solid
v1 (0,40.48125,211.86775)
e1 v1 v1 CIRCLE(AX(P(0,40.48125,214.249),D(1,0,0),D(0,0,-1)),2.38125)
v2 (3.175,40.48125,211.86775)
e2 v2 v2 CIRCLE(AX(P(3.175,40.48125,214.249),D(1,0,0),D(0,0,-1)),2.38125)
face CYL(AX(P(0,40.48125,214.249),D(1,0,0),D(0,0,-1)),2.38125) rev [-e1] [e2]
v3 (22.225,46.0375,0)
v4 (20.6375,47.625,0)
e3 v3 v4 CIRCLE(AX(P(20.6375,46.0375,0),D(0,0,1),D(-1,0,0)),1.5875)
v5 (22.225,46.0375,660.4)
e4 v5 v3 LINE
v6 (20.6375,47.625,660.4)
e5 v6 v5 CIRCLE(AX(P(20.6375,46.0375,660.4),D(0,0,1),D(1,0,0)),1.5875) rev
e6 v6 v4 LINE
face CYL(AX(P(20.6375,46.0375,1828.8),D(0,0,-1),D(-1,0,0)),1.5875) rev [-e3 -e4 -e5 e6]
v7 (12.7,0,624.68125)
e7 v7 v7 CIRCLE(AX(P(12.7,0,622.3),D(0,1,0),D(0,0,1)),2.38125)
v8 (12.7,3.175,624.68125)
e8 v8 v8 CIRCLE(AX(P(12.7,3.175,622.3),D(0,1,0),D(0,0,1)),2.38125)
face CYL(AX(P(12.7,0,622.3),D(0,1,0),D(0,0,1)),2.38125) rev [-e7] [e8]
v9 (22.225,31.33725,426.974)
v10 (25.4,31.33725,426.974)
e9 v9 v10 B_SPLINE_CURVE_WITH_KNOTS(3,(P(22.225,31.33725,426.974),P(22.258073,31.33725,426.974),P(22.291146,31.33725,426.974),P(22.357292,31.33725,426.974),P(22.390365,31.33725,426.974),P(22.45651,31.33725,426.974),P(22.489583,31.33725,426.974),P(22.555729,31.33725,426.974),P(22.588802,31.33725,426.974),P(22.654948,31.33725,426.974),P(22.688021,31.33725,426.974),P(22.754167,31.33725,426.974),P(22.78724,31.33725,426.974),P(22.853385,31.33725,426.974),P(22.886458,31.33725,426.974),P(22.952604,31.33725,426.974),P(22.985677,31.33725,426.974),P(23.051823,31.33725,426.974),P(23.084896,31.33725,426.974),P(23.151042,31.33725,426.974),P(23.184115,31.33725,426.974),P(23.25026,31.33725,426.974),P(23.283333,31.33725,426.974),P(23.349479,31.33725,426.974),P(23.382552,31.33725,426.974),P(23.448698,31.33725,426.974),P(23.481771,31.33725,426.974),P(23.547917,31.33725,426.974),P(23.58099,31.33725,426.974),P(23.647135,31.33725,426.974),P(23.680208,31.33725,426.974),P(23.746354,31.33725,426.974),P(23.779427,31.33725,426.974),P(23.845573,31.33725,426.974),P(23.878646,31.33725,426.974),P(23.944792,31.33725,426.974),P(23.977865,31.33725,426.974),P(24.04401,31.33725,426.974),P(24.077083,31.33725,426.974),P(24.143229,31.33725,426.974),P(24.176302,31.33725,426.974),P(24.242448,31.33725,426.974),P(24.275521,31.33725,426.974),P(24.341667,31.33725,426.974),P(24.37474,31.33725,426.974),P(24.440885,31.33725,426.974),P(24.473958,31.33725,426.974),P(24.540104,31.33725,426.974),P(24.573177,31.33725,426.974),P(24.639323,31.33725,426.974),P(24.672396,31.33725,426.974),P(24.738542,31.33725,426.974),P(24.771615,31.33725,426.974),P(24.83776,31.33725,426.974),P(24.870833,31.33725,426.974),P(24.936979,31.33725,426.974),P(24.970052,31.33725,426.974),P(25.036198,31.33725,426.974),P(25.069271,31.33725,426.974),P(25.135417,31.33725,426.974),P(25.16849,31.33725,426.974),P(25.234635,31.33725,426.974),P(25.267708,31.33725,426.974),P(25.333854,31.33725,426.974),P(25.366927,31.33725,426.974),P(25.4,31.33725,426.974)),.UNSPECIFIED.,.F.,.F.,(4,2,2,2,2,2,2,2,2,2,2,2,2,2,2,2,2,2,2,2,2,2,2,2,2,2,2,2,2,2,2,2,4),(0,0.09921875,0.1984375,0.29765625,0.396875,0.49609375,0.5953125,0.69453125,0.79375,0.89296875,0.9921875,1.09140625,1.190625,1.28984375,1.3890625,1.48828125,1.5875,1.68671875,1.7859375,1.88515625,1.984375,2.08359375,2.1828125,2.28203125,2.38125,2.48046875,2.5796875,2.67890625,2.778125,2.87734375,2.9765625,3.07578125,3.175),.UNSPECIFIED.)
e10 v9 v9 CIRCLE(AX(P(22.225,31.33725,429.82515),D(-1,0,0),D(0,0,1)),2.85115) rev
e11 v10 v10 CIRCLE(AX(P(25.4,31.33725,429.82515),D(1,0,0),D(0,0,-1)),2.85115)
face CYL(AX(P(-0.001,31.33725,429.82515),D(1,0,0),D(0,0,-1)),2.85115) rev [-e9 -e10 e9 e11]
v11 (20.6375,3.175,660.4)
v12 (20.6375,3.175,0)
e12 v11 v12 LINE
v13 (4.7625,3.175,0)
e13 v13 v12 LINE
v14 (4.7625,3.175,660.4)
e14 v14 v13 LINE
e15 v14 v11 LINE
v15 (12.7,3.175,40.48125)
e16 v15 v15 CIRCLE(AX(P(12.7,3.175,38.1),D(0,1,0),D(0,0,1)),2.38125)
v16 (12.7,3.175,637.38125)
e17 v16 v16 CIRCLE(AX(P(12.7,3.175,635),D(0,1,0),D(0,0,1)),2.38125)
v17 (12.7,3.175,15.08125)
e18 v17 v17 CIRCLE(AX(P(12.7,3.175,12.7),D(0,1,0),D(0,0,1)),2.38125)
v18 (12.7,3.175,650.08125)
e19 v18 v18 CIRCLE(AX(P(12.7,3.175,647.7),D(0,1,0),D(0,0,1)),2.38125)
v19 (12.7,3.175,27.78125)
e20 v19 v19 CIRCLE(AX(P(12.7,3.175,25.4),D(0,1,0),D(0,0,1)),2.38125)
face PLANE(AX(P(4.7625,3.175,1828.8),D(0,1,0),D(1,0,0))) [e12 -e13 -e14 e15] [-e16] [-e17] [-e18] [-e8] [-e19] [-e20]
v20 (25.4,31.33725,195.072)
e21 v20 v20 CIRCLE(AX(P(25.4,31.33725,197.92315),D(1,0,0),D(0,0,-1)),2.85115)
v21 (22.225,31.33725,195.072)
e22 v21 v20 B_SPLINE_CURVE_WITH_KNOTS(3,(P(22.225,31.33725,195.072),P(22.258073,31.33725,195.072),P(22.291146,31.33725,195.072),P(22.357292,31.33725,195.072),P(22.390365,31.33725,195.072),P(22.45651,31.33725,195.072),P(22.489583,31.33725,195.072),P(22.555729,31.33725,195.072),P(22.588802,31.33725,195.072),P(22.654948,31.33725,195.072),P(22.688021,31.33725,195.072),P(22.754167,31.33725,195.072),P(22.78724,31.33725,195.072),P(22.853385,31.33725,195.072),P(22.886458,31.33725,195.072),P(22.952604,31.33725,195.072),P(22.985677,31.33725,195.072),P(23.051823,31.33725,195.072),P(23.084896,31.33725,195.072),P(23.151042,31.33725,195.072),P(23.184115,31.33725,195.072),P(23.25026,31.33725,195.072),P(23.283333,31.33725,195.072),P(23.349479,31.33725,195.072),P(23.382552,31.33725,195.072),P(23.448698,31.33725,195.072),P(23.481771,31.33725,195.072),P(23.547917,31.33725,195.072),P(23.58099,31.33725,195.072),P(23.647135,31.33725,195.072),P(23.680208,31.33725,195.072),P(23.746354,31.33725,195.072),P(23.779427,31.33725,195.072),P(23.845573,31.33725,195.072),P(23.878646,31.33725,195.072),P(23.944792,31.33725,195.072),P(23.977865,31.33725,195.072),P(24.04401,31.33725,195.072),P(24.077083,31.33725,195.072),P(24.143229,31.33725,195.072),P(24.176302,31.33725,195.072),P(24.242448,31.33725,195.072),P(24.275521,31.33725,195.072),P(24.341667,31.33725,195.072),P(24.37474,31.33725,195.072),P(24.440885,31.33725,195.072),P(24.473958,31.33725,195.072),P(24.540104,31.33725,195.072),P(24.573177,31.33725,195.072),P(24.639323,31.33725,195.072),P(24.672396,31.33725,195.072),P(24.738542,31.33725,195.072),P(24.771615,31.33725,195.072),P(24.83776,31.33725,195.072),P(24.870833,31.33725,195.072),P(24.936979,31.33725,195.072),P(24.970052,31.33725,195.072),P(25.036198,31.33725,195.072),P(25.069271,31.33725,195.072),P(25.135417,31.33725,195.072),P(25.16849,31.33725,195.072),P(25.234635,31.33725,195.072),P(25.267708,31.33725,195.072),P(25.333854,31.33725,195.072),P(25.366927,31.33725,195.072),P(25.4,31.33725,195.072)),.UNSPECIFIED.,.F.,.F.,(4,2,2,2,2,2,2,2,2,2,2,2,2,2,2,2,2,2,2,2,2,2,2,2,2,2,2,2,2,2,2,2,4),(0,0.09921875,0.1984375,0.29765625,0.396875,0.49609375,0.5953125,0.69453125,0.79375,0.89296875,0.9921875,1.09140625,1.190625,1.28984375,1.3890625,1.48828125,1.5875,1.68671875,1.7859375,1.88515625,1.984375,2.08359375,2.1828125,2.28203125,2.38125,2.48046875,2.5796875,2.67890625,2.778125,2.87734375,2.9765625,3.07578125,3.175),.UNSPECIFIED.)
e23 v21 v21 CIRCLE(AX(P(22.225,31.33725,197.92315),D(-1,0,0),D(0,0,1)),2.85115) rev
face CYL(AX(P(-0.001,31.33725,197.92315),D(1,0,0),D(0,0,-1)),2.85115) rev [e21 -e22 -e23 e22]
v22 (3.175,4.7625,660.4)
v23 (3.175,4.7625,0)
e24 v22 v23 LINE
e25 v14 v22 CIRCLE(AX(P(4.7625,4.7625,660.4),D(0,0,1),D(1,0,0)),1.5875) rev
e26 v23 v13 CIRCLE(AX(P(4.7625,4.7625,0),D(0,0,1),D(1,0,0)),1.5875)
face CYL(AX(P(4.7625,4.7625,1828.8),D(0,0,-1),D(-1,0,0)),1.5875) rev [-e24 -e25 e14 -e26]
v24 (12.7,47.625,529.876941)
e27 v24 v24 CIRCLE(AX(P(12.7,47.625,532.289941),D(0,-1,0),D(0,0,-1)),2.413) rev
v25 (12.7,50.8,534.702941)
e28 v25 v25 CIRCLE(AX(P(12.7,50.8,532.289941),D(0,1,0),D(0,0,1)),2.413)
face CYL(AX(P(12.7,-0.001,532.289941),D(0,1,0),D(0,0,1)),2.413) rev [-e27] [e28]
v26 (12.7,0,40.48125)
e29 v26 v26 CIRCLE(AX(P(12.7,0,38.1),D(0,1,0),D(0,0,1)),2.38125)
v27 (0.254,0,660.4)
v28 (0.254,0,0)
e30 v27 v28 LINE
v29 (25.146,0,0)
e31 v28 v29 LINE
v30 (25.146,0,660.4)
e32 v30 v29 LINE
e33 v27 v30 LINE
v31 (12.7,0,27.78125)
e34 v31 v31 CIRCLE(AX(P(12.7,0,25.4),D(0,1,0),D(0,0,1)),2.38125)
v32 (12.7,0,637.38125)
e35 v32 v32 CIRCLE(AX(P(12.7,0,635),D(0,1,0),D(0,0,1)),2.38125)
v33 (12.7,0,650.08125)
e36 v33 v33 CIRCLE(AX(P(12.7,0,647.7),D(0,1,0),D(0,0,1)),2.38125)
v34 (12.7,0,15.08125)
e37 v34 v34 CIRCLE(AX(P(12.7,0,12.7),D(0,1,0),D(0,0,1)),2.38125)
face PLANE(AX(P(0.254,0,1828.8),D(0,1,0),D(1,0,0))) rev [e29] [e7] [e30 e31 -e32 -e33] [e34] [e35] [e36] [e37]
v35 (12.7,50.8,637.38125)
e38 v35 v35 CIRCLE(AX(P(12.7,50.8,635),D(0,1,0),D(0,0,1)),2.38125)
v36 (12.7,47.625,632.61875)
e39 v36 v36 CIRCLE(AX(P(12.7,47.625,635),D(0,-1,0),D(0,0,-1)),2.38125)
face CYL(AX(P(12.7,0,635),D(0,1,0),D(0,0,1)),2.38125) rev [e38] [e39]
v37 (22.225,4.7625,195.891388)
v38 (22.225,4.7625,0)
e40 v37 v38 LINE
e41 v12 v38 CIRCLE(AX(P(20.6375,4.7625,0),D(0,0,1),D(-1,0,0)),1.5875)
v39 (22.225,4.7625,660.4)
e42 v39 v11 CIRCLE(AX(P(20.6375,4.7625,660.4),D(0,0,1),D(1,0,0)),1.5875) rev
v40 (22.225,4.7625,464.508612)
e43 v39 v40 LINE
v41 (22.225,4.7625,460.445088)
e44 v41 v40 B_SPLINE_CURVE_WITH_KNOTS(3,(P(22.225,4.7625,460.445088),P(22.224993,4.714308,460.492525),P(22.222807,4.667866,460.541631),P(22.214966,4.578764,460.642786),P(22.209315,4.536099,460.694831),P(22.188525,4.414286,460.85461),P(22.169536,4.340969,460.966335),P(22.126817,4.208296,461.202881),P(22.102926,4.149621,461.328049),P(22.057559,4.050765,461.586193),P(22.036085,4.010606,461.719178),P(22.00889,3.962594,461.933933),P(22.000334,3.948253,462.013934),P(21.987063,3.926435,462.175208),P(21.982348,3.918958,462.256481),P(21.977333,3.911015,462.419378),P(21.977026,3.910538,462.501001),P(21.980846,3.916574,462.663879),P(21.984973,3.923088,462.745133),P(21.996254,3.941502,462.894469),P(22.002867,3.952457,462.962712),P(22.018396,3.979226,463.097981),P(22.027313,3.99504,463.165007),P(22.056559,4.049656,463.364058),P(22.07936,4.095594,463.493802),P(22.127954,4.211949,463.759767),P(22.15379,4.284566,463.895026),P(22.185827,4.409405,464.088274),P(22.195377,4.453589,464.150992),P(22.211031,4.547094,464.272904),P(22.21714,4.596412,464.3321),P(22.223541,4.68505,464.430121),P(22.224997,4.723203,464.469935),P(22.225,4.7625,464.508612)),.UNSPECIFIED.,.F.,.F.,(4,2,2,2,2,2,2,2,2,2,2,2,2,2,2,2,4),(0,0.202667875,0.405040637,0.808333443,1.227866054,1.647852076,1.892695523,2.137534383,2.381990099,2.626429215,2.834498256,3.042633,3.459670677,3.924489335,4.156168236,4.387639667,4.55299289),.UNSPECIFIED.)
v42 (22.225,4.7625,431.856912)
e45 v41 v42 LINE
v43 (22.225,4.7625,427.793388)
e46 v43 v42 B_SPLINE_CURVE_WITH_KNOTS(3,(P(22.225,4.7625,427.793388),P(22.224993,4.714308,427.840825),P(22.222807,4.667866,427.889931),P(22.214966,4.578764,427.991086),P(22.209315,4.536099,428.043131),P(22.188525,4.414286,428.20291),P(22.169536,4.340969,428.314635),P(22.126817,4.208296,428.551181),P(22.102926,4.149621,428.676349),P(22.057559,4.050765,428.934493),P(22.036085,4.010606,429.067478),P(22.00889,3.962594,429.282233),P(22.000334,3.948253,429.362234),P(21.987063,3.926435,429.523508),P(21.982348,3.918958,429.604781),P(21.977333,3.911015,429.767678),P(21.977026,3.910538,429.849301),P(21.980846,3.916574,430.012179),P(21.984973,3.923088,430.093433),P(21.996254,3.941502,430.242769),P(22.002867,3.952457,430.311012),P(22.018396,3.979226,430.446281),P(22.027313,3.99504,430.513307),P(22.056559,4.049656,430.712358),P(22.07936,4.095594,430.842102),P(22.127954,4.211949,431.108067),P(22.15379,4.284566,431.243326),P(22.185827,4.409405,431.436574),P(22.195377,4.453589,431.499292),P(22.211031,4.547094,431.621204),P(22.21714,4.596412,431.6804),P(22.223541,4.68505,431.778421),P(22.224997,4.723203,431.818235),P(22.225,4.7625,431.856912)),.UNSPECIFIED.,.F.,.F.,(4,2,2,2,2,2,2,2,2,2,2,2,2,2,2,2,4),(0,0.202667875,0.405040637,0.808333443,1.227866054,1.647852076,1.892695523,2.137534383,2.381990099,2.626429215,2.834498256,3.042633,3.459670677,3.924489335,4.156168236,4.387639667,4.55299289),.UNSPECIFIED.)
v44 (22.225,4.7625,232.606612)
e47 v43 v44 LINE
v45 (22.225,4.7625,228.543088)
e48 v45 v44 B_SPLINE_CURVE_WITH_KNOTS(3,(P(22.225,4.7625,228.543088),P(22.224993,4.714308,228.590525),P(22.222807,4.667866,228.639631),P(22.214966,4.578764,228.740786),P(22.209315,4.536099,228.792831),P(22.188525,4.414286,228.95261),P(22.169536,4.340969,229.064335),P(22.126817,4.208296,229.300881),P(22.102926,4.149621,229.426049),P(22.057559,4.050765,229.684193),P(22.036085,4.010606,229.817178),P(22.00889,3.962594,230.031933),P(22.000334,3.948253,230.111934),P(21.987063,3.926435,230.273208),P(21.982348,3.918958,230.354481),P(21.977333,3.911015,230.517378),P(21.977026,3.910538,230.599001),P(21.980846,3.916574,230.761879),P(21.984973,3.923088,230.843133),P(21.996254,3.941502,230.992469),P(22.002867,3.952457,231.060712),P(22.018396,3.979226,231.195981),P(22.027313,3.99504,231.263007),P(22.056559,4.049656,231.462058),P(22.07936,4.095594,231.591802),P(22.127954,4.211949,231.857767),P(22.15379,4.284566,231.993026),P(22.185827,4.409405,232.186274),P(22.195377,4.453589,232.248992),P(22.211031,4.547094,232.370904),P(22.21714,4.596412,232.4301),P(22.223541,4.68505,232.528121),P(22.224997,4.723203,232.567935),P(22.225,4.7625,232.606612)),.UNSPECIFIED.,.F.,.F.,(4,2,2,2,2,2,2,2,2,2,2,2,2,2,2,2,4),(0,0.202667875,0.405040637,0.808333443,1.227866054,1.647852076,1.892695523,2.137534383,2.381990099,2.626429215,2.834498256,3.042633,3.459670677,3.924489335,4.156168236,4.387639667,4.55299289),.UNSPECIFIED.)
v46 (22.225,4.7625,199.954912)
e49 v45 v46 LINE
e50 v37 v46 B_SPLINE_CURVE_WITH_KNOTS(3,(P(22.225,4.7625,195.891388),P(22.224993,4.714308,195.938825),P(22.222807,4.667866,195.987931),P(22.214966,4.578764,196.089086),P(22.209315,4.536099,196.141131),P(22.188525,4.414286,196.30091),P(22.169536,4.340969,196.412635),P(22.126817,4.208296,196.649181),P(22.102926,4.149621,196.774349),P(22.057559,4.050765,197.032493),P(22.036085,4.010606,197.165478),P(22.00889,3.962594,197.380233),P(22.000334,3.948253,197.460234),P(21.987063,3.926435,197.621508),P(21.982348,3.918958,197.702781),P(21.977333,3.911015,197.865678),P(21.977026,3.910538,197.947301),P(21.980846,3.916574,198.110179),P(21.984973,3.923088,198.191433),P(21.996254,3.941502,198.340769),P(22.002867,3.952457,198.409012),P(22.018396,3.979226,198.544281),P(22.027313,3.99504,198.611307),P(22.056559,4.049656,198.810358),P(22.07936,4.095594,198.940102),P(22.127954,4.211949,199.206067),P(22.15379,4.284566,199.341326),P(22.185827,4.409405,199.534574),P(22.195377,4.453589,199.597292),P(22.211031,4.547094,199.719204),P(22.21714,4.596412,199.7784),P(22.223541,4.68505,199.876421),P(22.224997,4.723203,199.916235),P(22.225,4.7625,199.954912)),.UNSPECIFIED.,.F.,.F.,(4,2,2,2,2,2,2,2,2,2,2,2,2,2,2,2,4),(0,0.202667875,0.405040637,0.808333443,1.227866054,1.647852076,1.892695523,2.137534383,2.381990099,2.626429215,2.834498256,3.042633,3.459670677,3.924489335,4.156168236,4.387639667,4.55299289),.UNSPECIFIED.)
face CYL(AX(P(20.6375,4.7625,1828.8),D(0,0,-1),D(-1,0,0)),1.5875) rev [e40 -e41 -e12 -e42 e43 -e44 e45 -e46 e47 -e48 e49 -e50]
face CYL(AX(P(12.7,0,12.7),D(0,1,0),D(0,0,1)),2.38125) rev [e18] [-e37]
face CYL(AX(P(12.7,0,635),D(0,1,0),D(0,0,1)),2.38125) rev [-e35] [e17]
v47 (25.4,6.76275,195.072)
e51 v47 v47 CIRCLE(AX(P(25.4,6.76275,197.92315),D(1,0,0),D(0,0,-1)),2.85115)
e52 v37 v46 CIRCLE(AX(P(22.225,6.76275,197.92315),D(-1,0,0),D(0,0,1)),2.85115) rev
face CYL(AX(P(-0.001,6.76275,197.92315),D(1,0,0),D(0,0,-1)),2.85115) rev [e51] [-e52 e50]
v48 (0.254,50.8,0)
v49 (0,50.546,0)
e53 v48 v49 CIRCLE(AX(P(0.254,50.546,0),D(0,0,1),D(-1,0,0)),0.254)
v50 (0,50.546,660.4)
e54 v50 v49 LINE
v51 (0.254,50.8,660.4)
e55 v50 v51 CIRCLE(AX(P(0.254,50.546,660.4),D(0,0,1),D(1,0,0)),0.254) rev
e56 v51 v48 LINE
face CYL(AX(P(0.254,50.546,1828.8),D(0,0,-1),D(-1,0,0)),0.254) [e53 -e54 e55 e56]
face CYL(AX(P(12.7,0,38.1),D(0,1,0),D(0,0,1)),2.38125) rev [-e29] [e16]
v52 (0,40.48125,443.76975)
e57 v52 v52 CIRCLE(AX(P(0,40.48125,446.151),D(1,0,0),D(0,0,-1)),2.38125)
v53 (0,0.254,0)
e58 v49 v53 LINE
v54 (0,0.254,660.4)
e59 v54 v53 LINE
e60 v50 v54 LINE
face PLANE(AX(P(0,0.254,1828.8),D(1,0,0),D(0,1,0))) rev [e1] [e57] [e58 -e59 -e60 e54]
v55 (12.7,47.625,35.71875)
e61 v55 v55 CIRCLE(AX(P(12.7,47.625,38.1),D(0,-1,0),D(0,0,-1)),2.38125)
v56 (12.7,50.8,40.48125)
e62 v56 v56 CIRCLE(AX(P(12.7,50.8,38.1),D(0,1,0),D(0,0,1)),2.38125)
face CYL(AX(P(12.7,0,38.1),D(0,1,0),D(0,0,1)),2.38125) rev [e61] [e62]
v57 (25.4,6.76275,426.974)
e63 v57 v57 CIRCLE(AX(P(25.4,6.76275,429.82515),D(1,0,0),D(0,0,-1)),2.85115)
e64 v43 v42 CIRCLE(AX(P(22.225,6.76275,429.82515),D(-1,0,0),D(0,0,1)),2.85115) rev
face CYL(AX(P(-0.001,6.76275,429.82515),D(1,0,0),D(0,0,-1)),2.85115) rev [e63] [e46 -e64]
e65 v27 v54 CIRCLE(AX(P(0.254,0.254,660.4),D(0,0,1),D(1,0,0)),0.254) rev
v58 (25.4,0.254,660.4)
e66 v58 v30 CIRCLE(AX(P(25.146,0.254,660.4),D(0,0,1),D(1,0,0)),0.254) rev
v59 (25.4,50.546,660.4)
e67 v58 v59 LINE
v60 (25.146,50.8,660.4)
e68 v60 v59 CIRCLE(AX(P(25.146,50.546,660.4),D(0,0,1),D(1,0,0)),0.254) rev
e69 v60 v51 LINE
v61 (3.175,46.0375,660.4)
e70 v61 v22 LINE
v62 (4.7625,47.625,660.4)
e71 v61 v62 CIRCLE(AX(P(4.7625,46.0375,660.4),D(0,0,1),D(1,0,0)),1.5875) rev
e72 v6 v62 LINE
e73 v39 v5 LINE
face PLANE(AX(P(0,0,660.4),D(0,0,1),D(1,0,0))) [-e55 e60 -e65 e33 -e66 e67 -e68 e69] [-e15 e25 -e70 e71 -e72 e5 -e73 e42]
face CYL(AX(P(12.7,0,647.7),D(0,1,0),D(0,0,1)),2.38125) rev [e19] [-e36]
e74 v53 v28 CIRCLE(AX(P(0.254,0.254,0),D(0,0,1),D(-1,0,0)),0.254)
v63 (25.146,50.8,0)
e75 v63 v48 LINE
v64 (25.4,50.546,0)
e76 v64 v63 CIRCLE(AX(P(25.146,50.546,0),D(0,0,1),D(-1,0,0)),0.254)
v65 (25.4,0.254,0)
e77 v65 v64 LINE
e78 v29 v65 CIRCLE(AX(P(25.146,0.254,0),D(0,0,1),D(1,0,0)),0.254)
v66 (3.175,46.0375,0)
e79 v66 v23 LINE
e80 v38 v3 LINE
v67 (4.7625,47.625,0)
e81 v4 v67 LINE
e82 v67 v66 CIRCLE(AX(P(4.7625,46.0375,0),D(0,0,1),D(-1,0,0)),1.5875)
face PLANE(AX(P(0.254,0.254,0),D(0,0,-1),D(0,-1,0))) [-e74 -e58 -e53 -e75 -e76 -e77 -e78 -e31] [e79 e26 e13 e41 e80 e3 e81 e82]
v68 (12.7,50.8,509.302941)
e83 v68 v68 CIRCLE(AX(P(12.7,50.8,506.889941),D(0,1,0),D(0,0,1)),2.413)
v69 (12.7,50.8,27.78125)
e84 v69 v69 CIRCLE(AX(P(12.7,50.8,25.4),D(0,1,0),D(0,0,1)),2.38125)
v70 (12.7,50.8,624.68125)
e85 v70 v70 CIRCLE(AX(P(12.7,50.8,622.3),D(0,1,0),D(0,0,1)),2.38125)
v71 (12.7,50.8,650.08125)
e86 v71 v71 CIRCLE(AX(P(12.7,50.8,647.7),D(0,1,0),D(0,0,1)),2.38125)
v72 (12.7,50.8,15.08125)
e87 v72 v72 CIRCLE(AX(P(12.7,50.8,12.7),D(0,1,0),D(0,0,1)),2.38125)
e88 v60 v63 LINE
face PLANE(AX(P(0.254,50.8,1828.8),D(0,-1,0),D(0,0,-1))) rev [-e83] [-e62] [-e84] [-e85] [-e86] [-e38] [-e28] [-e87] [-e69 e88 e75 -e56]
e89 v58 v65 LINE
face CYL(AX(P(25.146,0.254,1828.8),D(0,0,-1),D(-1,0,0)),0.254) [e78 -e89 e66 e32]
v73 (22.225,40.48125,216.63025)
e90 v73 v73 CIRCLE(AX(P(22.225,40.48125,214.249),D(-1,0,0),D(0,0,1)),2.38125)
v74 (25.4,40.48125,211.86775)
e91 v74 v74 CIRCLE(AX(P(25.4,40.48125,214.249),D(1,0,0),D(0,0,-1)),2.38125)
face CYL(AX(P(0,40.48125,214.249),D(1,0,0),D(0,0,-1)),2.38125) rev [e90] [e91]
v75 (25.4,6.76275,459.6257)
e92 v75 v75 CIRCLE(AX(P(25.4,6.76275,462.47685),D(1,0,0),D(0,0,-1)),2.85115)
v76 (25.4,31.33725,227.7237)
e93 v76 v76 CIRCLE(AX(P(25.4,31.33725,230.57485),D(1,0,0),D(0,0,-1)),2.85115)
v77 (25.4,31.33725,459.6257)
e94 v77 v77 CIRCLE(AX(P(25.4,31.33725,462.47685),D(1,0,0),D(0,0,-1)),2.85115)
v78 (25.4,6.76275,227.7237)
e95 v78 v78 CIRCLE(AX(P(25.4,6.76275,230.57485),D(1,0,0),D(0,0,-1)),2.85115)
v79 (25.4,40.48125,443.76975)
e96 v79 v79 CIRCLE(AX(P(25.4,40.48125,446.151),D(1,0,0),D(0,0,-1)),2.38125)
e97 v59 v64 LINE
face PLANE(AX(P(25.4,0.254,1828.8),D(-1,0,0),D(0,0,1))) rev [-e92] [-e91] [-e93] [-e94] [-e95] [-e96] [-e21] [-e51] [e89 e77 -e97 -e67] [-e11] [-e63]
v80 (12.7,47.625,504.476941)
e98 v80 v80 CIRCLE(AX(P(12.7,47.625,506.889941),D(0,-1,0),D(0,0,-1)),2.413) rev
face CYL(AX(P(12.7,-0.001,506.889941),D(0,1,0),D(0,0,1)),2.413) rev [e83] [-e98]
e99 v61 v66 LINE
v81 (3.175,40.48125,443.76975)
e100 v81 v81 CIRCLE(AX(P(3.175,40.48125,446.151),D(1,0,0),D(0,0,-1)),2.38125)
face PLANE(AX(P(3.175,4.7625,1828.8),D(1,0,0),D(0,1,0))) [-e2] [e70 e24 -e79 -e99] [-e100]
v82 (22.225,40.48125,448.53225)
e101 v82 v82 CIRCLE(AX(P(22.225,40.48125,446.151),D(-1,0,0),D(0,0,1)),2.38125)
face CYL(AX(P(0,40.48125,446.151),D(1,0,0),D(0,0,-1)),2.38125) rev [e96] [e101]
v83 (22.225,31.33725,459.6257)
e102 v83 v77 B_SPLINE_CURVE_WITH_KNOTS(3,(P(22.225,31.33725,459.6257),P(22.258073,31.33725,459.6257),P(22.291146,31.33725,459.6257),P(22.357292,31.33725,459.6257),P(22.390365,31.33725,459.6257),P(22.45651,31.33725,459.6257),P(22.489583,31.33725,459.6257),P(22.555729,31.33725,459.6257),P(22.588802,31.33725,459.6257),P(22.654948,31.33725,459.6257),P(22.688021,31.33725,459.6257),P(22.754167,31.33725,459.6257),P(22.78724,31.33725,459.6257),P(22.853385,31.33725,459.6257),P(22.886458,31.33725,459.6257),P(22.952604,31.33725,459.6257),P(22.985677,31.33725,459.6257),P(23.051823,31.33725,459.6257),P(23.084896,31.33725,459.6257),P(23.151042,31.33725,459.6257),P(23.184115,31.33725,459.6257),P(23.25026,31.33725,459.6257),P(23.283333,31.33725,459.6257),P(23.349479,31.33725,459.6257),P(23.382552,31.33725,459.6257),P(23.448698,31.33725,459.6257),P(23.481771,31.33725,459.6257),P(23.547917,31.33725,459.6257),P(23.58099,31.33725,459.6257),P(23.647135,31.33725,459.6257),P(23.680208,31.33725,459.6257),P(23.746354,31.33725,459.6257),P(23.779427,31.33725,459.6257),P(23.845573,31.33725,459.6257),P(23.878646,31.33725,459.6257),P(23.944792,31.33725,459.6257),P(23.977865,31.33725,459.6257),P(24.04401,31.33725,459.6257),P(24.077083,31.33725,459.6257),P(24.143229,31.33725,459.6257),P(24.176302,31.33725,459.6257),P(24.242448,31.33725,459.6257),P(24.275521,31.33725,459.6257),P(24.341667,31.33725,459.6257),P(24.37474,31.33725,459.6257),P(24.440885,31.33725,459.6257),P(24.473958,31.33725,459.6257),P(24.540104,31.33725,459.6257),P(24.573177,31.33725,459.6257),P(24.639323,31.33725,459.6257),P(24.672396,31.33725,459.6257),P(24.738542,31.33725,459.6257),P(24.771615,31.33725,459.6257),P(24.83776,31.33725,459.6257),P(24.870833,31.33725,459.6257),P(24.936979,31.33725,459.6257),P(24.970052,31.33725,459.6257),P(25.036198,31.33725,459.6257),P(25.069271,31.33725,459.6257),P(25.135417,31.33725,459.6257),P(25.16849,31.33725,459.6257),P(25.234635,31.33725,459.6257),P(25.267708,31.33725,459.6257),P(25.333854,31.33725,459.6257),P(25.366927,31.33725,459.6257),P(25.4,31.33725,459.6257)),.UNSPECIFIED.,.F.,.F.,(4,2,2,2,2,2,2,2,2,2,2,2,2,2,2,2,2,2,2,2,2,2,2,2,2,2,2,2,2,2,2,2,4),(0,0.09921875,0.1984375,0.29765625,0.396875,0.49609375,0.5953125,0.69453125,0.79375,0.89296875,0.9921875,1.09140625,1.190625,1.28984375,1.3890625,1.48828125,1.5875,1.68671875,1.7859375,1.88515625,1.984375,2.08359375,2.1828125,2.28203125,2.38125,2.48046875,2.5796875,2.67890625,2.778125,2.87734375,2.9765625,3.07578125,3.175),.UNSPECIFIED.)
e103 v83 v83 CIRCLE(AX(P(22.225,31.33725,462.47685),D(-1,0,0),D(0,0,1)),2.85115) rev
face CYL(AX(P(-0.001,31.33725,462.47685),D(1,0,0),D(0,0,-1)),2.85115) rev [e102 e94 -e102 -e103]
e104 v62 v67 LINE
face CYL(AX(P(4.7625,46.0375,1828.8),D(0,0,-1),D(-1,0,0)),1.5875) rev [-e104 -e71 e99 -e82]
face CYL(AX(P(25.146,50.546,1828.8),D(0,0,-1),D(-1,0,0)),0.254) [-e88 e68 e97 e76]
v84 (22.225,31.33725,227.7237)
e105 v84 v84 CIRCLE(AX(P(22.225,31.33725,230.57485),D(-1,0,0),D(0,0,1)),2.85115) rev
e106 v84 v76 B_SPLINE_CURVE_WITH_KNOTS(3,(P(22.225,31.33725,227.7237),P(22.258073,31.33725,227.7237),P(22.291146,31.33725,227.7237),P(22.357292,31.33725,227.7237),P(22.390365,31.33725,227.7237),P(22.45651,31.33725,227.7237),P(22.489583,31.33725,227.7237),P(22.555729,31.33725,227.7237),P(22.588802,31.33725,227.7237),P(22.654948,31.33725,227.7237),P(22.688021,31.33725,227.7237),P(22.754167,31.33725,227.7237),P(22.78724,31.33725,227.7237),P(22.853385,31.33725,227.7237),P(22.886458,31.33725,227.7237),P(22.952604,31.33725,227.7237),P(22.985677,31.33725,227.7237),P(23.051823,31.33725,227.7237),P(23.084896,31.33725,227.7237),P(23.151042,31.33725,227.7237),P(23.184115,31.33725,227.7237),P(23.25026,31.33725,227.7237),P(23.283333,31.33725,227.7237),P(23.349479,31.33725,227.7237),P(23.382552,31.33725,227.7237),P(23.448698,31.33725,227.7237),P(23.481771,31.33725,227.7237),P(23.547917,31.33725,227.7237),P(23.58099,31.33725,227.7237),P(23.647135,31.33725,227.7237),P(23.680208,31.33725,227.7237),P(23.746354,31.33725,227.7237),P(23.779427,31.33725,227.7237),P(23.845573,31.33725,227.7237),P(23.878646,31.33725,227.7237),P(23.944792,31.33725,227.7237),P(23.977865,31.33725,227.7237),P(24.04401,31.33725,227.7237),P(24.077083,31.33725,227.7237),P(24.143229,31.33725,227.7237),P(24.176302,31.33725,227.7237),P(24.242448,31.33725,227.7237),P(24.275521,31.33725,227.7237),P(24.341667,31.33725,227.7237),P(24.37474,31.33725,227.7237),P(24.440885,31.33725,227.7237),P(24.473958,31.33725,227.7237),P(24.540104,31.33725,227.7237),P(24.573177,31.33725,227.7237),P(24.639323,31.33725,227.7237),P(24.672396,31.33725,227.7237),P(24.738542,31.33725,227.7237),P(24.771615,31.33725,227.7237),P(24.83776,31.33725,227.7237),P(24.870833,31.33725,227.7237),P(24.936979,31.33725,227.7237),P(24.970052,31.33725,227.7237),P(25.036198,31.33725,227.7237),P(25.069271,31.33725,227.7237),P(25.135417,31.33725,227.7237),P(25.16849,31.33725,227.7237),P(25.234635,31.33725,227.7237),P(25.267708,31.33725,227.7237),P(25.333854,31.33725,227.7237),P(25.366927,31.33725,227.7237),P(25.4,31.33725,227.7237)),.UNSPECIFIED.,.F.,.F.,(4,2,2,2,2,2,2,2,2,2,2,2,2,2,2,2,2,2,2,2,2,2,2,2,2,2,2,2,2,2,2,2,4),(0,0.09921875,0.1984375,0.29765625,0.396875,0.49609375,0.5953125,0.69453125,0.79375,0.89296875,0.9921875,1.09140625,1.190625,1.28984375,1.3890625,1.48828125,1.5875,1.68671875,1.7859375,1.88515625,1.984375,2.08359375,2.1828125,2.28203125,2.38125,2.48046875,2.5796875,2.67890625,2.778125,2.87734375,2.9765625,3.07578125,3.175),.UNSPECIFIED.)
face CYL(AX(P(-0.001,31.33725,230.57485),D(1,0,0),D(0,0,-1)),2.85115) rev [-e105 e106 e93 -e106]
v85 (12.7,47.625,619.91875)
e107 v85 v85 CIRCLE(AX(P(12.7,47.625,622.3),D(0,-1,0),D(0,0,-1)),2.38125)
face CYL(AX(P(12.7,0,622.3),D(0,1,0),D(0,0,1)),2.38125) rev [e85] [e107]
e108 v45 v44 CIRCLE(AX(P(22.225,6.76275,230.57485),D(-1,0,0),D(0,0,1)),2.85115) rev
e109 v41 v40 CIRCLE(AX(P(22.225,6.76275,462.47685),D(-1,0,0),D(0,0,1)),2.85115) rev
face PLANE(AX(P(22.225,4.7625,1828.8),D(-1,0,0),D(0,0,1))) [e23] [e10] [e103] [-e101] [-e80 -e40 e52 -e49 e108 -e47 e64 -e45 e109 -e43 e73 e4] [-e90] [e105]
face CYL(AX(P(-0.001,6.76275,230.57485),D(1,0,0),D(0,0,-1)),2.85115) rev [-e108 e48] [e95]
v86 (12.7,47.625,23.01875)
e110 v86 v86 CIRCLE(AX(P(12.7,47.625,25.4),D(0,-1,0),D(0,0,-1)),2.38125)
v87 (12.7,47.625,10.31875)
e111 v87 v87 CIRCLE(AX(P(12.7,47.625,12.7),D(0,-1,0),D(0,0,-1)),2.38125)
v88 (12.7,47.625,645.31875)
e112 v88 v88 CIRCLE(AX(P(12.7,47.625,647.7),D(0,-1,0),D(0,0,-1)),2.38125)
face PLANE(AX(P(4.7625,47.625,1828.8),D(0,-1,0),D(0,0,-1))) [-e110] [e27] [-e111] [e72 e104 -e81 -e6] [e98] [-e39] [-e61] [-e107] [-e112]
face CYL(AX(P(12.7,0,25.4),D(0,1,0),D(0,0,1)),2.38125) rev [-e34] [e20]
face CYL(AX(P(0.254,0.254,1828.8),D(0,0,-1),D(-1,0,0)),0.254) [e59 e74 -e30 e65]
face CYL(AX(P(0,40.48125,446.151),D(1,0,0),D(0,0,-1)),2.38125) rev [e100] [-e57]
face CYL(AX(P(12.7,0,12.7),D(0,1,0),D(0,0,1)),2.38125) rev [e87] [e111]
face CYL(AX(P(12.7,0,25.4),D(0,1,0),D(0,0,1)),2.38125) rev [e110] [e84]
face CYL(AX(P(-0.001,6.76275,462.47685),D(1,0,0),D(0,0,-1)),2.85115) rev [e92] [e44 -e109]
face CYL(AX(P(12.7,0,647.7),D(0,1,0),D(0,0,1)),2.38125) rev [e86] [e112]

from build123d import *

# Parameters (mm, degrees)
CUT_EXTRUDE1_START = -1828.8
CUT_EXTRUDE1_DEPTH = 660.4
SKETCH3_R          = 2.38125
CUT_EXTRUDE3_DEPTH = 50.8
CUT_EXTRUDE4_REACH = 664.838
SKETCH4_R          = 2.413
CUT_EXTRUDE5_REACH = 664.838
SKETCH5_R          = 2.85115
SKETCH6_R          = 2.38125
CUT_EXTRUDE6_DEPTH = 663.837808315


with BuildPart() as part:
    # Cut-Extrude1: read off the stored shape, not the designer's step
    # Cut-Extrude1 outline → Cut-Extrude1 (new body)
    with BuildSketch(Plane.XY.offset(1828.8).offset(CUT_EXTRUDE1_START)):
        with BuildLine():
            Line((0, 50.546), (0, 0.254))
            ThreePointArc((0, 0.254), (0.074394878, 0.074394878), (0.254, 0))
            Line((0.254, 0), (25.146, 0))
            ThreePointArc((25.146, 0), (25.325605122, 0.074394878), (25.4, 0.254))
            Line((25.4, 0.254), (25.4, 50.546))
            ThreePointArc((25.4, 50.546), (25.325605122, 50.725605122), (25.146, 50.8))
            Line((25.146, 50.8), (0.254, 50.8))
            ThreePointArc((0.254, 50.8), (0.074394878, 50.725605122), (0, 50.546))
        make_face()
        with BuildLine():
            ThreePointArc((4.7625, 3.175), (3.639967985, 3.639967985), (3.175, 4.7625))
            Line((3.175, 4.7625), (3.175, 46.0375))
            ThreePointArc((3.175, 46.0375), (3.639967985, 47.160032015), (4.7625, 47.625))
            Line((4.7625, 47.625), (20.6375, 47.625))
            ThreePointArc((20.6375, 47.625), (21.760032015, 47.160032015), (22.225, 46.0375))
            Line((22.225, 46.0375), (22.225, 4.7625))
            ThreePointArc((22.225, 4.7625), (21.760032015, 3.639967985), (20.6375, 3.175))
            Line((20.6375, 3.175), (4.7625, 3.175))
        make_face(mode=Mode.SUBTRACT)
    extrude(amount=CUT_EXTRUDE1_DEPTH)

    # Sketch3 → Cut-Extrude3 (cut)
    with BuildSketch(Plane(origin=(0, 50.8, 0), x_dir=(1, 0, 0), z_dir=(0, 1, 0))):
        with Locations(Location((12.7, -25.4, 0), (0, 0, 270))):
            Circle(SKETCH3_R)
        with Locations(Location((12.7, -12.7, 0), (0, 0, 270))):
            Circle(SKETCH3_R)
        with Locations(Location((12.7, -38.1, 0), (0, 0, 270))):
            Circle(SKETCH3_R)
        with Locations(Location((12.7, -622.3, 0), (0, 0, 270))):
            Circle(SKETCH3_R)
        with Locations(Location((12.7, -635, 0), (0, 0, 270))):
            Circle(SKETCH3_R)
        with Locations(Location((12.7, -647.7, 0), (0, 0, 270))):
            Circle(SKETCH3_R)
    extrude(amount=-CUT_EXTRUDE3_DEPTH, mode=Mode.SUBTRACT)

    # Sketch4 → Cut-Extrude4 (cut, up to next)
    with BuildSketch(Plane(origin=(0, 50.8, 0), x_dir=(1, 0, 0), z_dir=(0, 1, 0)), mode=Mode.PRIVATE) as cut_extrude4_sk1:
        with Locations(Location((12.7, -532.289940881, 0), (0, 0, 270))):
            Circle(SKETCH4_R)
    cut_extrude4_tool1 = extrude(cut_extrude4_sk1.sketch, amount=-CUT_EXTRUDE4_REACH, mode=Mode.PRIVATE) & part.part
    # Sketch4 → Cut-Extrude4 (cut, up to next)
    with BuildSketch(Plane(origin=(0, 50.8, 0), x_dir=(1, 0, 0), z_dir=(0, 1, 0)), mode=Mode.PRIVATE) as cut_extrude4_sk2:
        with Locations(Location((12.7, -506.889940881, 0), (0, 0, 270))):
            Circle(SKETCH4_R)
    cut_extrude4_tool2 = extrude(cut_extrude4_sk2.sketch, amount=-CUT_EXTRUDE4_REACH, mode=Mode.PRIVATE) & part.part
    add(cut_extrude4_tool1.solids().sort_by_distance((12.7, 50.8, 532.289941))[0], mode=Mode.SUBTRACT)
    add(cut_extrude4_tool2.solids().sort_by_distance((12.7, 50.8, 506.889941))[0], mode=Mode.SUBTRACT)

    # Sketch5 → Cut-Extrude5 (cut, up to next)
    with BuildSketch(Plane(origin=(25.4, 0, 0), x_dir=(0, 0, -1), z_dir=(1, 0, 0)), mode=Mode.PRIVATE) as cut_extrude5_sk1:
        with Locations((-462.47685, 31.33725)):
            Circle(SKETCH5_R)
    cut_extrude5_tool1 = extrude(cut_extrude5_sk1.sketch, amount=-CUT_EXTRUDE5_REACH, mode=Mode.PRIVATE) & part.part
    # Sketch5 → Cut-Extrude5 (cut, up to next)
    with BuildSketch(Plane(origin=(25.4, 0, 0), x_dir=(0, 0, -1), z_dir=(1, 0, 0)), mode=Mode.PRIVATE) as cut_extrude5_sk2:
        with Locations((-429.82515, 31.33725)):
            Circle(SKETCH5_R)
    cut_extrude5_tool2 = extrude(cut_extrude5_sk2.sketch, amount=-CUT_EXTRUDE5_REACH, mode=Mode.PRIVATE) & part.part
    # Sketch5 → Cut-Extrude5 (cut, up to next)
    with BuildSketch(Plane(origin=(25.4, 0, 0), x_dir=(0, 0, -1), z_dir=(1, 0, 0)), mode=Mode.PRIVATE) as cut_extrude5_sk3:
        with Locations((-429.82515, 6.76275)):
            Circle(SKETCH5_R)
    cut_extrude5_tool3 = extrude(cut_extrude5_sk3.sketch, amount=-CUT_EXTRUDE5_REACH, mode=Mode.PRIVATE) & part.part
    # Sketch5 → Cut-Extrude5 (cut, up to next)
    with BuildSketch(Plane(origin=(25.4, 0, 0), x_dir=(0, 0, -1), z_dir=(1, 0, 0)), mode=Mode.PRIVATE) as cut_extrude5_sk4:
        with Locations((-462.47685, 6.76275)):
            Circle(SKETCH5_R)
    cut_extrude5_tool4 = extrude(cut_extrude5_sk4.sketch, amount=-CUT_EXTRUDE5_REACH, mode=Mode.PRIVATE) & part.part
    # Sketch5 → Cut-Extrude5 (cut, up to next)
    with BuildSketch(Plane(origin=(25.4, 0, 0), x_dir=(0, 0, -1), z_dir=(1, 0, 0)), mode=Mode.PRIVATE) as cut_extrude5_sk5:
        with Locations((-197.92315, 6.76275)):
            Circle(SKETCH5_R)
    cut_extrude5_tool5 = extrude(cut_extrude5_sk5.sketch, amount=-CUT_EXTRUDE5_REACH, mode=Mode.PRIVATE) & part.part
    # Sketch5 → Cut-Extrude5 (cut, up to next)
    with BuildSketch(Plane(origin=(25.4, 0, 0), x_dir=(0, 0, -1), z_dir=(1, 0, 0)), mode=Mode.PRIVATE) as cut_extrude5_sk6:
        with Locations((-230.57485, 31.33725)):
            Circle(SKETCH5_R)
    cut_extrude5_tool6 = extrude(cut_extrude5_sk6.sketch, amount=-CUT_EXTRUDE5_REACH, mode=Mode.PRIVATE) & part.part
    # Sketch5 → Cut-Extrude5 (cut, up to next)
    with BuildSketch(Plane(origin=(25.4, 0, 0), x_dir=(0, 0, -1), z_dir=(1, 0, 0)), mode=Mode.PRIVATE) as cut_extrude5_sk7:
        with Locations((-197.92315, 31.33725)):
            Circle(SKETCH5_R)
    cut_extrude5_tool7 = extrude(cut_extrude5_sk7.sketch, amount=-CUT_EXTRUDE5_REACH, mode=Mode.PRIVATE) & part.part
    # Sketch5 → Cut-Extrude5 (cut, up to next)
    with BuildSketch(Plane(origin=(25.4, 0, 0), x_dir=(0, 0, -1), z_dir=(1, 0, 0)), mode=Mode.PRIVATE) as cut_extrude5_sk8:
        with Locations((-230.57485, 6.76275)):
            Circle(SKETCH5_R)
    cut_extrude5_tool8 = extrude(cut_extrude5_sk8.sketch, amount=-CUT_EXTRUDE5_REACH, mode=Mode.PRIVATE) & part.part
    add(cut_extrude5_tool1.solids().sort_by_distance((25.4, 31.33725, 462.47685))[0], mode=Mode.SUBTRACT)
    add(cut_extrude5_tool2.solids().sort_by_distance((25.4, 31.33725, 429.82515))[0], mode=Mode.SUBTRACT)
    add(cut_extrude5_tool3.solids().sort_by_distance((25.4, 6.76275, 429.82515))[0], mode=Mode.SUBTRACT)
    add(cut_extrude5_tool4.solids().sort_by_distance((25.4, 6.76275, 462.47685))[0], mode=Mode.SUBTRACT)
    add(cut_extrude5_tool5.solids().sort_by_distance((25.4, 6.76275, 197.92315))[0], mode=Mode.SUBTRACT)
    add(cut_extrude5_tool6.solids().sort_by_distance((25.4, 31.33725, 230.57485))[0], mode=Mode.SUBTRACT)
    add(cut_extrude5_tool7.solids().sort_by_distance((25.4, 31.33725, 197.92315))[0], mode=Mode.SUBTRACT)
    add(cut_extrude5_tool8.solids().sort_by_distance((25.4, 6.76275, 230.57485))[0], mode=Mode.SUBTRACT)

    # Sketch6 → Cut-Extrude6 (cut, through all)
    with BuildSketch(Plane(origin=(25.4, 0, 0), x_dir=(0, 0, -1), z_dir=(1, 0, 0))):
        with Locations((-214.249, 40.48125)):
            Circle(SKETCH6_R)
        with Locations((-446.151, 40.48125)):
            Circle(SKETCH6_R)
    extrude(amount=-CUT_EXTRUDE6_DEPTH, mode=Mode.SUBTRACT)


solid = part.part
